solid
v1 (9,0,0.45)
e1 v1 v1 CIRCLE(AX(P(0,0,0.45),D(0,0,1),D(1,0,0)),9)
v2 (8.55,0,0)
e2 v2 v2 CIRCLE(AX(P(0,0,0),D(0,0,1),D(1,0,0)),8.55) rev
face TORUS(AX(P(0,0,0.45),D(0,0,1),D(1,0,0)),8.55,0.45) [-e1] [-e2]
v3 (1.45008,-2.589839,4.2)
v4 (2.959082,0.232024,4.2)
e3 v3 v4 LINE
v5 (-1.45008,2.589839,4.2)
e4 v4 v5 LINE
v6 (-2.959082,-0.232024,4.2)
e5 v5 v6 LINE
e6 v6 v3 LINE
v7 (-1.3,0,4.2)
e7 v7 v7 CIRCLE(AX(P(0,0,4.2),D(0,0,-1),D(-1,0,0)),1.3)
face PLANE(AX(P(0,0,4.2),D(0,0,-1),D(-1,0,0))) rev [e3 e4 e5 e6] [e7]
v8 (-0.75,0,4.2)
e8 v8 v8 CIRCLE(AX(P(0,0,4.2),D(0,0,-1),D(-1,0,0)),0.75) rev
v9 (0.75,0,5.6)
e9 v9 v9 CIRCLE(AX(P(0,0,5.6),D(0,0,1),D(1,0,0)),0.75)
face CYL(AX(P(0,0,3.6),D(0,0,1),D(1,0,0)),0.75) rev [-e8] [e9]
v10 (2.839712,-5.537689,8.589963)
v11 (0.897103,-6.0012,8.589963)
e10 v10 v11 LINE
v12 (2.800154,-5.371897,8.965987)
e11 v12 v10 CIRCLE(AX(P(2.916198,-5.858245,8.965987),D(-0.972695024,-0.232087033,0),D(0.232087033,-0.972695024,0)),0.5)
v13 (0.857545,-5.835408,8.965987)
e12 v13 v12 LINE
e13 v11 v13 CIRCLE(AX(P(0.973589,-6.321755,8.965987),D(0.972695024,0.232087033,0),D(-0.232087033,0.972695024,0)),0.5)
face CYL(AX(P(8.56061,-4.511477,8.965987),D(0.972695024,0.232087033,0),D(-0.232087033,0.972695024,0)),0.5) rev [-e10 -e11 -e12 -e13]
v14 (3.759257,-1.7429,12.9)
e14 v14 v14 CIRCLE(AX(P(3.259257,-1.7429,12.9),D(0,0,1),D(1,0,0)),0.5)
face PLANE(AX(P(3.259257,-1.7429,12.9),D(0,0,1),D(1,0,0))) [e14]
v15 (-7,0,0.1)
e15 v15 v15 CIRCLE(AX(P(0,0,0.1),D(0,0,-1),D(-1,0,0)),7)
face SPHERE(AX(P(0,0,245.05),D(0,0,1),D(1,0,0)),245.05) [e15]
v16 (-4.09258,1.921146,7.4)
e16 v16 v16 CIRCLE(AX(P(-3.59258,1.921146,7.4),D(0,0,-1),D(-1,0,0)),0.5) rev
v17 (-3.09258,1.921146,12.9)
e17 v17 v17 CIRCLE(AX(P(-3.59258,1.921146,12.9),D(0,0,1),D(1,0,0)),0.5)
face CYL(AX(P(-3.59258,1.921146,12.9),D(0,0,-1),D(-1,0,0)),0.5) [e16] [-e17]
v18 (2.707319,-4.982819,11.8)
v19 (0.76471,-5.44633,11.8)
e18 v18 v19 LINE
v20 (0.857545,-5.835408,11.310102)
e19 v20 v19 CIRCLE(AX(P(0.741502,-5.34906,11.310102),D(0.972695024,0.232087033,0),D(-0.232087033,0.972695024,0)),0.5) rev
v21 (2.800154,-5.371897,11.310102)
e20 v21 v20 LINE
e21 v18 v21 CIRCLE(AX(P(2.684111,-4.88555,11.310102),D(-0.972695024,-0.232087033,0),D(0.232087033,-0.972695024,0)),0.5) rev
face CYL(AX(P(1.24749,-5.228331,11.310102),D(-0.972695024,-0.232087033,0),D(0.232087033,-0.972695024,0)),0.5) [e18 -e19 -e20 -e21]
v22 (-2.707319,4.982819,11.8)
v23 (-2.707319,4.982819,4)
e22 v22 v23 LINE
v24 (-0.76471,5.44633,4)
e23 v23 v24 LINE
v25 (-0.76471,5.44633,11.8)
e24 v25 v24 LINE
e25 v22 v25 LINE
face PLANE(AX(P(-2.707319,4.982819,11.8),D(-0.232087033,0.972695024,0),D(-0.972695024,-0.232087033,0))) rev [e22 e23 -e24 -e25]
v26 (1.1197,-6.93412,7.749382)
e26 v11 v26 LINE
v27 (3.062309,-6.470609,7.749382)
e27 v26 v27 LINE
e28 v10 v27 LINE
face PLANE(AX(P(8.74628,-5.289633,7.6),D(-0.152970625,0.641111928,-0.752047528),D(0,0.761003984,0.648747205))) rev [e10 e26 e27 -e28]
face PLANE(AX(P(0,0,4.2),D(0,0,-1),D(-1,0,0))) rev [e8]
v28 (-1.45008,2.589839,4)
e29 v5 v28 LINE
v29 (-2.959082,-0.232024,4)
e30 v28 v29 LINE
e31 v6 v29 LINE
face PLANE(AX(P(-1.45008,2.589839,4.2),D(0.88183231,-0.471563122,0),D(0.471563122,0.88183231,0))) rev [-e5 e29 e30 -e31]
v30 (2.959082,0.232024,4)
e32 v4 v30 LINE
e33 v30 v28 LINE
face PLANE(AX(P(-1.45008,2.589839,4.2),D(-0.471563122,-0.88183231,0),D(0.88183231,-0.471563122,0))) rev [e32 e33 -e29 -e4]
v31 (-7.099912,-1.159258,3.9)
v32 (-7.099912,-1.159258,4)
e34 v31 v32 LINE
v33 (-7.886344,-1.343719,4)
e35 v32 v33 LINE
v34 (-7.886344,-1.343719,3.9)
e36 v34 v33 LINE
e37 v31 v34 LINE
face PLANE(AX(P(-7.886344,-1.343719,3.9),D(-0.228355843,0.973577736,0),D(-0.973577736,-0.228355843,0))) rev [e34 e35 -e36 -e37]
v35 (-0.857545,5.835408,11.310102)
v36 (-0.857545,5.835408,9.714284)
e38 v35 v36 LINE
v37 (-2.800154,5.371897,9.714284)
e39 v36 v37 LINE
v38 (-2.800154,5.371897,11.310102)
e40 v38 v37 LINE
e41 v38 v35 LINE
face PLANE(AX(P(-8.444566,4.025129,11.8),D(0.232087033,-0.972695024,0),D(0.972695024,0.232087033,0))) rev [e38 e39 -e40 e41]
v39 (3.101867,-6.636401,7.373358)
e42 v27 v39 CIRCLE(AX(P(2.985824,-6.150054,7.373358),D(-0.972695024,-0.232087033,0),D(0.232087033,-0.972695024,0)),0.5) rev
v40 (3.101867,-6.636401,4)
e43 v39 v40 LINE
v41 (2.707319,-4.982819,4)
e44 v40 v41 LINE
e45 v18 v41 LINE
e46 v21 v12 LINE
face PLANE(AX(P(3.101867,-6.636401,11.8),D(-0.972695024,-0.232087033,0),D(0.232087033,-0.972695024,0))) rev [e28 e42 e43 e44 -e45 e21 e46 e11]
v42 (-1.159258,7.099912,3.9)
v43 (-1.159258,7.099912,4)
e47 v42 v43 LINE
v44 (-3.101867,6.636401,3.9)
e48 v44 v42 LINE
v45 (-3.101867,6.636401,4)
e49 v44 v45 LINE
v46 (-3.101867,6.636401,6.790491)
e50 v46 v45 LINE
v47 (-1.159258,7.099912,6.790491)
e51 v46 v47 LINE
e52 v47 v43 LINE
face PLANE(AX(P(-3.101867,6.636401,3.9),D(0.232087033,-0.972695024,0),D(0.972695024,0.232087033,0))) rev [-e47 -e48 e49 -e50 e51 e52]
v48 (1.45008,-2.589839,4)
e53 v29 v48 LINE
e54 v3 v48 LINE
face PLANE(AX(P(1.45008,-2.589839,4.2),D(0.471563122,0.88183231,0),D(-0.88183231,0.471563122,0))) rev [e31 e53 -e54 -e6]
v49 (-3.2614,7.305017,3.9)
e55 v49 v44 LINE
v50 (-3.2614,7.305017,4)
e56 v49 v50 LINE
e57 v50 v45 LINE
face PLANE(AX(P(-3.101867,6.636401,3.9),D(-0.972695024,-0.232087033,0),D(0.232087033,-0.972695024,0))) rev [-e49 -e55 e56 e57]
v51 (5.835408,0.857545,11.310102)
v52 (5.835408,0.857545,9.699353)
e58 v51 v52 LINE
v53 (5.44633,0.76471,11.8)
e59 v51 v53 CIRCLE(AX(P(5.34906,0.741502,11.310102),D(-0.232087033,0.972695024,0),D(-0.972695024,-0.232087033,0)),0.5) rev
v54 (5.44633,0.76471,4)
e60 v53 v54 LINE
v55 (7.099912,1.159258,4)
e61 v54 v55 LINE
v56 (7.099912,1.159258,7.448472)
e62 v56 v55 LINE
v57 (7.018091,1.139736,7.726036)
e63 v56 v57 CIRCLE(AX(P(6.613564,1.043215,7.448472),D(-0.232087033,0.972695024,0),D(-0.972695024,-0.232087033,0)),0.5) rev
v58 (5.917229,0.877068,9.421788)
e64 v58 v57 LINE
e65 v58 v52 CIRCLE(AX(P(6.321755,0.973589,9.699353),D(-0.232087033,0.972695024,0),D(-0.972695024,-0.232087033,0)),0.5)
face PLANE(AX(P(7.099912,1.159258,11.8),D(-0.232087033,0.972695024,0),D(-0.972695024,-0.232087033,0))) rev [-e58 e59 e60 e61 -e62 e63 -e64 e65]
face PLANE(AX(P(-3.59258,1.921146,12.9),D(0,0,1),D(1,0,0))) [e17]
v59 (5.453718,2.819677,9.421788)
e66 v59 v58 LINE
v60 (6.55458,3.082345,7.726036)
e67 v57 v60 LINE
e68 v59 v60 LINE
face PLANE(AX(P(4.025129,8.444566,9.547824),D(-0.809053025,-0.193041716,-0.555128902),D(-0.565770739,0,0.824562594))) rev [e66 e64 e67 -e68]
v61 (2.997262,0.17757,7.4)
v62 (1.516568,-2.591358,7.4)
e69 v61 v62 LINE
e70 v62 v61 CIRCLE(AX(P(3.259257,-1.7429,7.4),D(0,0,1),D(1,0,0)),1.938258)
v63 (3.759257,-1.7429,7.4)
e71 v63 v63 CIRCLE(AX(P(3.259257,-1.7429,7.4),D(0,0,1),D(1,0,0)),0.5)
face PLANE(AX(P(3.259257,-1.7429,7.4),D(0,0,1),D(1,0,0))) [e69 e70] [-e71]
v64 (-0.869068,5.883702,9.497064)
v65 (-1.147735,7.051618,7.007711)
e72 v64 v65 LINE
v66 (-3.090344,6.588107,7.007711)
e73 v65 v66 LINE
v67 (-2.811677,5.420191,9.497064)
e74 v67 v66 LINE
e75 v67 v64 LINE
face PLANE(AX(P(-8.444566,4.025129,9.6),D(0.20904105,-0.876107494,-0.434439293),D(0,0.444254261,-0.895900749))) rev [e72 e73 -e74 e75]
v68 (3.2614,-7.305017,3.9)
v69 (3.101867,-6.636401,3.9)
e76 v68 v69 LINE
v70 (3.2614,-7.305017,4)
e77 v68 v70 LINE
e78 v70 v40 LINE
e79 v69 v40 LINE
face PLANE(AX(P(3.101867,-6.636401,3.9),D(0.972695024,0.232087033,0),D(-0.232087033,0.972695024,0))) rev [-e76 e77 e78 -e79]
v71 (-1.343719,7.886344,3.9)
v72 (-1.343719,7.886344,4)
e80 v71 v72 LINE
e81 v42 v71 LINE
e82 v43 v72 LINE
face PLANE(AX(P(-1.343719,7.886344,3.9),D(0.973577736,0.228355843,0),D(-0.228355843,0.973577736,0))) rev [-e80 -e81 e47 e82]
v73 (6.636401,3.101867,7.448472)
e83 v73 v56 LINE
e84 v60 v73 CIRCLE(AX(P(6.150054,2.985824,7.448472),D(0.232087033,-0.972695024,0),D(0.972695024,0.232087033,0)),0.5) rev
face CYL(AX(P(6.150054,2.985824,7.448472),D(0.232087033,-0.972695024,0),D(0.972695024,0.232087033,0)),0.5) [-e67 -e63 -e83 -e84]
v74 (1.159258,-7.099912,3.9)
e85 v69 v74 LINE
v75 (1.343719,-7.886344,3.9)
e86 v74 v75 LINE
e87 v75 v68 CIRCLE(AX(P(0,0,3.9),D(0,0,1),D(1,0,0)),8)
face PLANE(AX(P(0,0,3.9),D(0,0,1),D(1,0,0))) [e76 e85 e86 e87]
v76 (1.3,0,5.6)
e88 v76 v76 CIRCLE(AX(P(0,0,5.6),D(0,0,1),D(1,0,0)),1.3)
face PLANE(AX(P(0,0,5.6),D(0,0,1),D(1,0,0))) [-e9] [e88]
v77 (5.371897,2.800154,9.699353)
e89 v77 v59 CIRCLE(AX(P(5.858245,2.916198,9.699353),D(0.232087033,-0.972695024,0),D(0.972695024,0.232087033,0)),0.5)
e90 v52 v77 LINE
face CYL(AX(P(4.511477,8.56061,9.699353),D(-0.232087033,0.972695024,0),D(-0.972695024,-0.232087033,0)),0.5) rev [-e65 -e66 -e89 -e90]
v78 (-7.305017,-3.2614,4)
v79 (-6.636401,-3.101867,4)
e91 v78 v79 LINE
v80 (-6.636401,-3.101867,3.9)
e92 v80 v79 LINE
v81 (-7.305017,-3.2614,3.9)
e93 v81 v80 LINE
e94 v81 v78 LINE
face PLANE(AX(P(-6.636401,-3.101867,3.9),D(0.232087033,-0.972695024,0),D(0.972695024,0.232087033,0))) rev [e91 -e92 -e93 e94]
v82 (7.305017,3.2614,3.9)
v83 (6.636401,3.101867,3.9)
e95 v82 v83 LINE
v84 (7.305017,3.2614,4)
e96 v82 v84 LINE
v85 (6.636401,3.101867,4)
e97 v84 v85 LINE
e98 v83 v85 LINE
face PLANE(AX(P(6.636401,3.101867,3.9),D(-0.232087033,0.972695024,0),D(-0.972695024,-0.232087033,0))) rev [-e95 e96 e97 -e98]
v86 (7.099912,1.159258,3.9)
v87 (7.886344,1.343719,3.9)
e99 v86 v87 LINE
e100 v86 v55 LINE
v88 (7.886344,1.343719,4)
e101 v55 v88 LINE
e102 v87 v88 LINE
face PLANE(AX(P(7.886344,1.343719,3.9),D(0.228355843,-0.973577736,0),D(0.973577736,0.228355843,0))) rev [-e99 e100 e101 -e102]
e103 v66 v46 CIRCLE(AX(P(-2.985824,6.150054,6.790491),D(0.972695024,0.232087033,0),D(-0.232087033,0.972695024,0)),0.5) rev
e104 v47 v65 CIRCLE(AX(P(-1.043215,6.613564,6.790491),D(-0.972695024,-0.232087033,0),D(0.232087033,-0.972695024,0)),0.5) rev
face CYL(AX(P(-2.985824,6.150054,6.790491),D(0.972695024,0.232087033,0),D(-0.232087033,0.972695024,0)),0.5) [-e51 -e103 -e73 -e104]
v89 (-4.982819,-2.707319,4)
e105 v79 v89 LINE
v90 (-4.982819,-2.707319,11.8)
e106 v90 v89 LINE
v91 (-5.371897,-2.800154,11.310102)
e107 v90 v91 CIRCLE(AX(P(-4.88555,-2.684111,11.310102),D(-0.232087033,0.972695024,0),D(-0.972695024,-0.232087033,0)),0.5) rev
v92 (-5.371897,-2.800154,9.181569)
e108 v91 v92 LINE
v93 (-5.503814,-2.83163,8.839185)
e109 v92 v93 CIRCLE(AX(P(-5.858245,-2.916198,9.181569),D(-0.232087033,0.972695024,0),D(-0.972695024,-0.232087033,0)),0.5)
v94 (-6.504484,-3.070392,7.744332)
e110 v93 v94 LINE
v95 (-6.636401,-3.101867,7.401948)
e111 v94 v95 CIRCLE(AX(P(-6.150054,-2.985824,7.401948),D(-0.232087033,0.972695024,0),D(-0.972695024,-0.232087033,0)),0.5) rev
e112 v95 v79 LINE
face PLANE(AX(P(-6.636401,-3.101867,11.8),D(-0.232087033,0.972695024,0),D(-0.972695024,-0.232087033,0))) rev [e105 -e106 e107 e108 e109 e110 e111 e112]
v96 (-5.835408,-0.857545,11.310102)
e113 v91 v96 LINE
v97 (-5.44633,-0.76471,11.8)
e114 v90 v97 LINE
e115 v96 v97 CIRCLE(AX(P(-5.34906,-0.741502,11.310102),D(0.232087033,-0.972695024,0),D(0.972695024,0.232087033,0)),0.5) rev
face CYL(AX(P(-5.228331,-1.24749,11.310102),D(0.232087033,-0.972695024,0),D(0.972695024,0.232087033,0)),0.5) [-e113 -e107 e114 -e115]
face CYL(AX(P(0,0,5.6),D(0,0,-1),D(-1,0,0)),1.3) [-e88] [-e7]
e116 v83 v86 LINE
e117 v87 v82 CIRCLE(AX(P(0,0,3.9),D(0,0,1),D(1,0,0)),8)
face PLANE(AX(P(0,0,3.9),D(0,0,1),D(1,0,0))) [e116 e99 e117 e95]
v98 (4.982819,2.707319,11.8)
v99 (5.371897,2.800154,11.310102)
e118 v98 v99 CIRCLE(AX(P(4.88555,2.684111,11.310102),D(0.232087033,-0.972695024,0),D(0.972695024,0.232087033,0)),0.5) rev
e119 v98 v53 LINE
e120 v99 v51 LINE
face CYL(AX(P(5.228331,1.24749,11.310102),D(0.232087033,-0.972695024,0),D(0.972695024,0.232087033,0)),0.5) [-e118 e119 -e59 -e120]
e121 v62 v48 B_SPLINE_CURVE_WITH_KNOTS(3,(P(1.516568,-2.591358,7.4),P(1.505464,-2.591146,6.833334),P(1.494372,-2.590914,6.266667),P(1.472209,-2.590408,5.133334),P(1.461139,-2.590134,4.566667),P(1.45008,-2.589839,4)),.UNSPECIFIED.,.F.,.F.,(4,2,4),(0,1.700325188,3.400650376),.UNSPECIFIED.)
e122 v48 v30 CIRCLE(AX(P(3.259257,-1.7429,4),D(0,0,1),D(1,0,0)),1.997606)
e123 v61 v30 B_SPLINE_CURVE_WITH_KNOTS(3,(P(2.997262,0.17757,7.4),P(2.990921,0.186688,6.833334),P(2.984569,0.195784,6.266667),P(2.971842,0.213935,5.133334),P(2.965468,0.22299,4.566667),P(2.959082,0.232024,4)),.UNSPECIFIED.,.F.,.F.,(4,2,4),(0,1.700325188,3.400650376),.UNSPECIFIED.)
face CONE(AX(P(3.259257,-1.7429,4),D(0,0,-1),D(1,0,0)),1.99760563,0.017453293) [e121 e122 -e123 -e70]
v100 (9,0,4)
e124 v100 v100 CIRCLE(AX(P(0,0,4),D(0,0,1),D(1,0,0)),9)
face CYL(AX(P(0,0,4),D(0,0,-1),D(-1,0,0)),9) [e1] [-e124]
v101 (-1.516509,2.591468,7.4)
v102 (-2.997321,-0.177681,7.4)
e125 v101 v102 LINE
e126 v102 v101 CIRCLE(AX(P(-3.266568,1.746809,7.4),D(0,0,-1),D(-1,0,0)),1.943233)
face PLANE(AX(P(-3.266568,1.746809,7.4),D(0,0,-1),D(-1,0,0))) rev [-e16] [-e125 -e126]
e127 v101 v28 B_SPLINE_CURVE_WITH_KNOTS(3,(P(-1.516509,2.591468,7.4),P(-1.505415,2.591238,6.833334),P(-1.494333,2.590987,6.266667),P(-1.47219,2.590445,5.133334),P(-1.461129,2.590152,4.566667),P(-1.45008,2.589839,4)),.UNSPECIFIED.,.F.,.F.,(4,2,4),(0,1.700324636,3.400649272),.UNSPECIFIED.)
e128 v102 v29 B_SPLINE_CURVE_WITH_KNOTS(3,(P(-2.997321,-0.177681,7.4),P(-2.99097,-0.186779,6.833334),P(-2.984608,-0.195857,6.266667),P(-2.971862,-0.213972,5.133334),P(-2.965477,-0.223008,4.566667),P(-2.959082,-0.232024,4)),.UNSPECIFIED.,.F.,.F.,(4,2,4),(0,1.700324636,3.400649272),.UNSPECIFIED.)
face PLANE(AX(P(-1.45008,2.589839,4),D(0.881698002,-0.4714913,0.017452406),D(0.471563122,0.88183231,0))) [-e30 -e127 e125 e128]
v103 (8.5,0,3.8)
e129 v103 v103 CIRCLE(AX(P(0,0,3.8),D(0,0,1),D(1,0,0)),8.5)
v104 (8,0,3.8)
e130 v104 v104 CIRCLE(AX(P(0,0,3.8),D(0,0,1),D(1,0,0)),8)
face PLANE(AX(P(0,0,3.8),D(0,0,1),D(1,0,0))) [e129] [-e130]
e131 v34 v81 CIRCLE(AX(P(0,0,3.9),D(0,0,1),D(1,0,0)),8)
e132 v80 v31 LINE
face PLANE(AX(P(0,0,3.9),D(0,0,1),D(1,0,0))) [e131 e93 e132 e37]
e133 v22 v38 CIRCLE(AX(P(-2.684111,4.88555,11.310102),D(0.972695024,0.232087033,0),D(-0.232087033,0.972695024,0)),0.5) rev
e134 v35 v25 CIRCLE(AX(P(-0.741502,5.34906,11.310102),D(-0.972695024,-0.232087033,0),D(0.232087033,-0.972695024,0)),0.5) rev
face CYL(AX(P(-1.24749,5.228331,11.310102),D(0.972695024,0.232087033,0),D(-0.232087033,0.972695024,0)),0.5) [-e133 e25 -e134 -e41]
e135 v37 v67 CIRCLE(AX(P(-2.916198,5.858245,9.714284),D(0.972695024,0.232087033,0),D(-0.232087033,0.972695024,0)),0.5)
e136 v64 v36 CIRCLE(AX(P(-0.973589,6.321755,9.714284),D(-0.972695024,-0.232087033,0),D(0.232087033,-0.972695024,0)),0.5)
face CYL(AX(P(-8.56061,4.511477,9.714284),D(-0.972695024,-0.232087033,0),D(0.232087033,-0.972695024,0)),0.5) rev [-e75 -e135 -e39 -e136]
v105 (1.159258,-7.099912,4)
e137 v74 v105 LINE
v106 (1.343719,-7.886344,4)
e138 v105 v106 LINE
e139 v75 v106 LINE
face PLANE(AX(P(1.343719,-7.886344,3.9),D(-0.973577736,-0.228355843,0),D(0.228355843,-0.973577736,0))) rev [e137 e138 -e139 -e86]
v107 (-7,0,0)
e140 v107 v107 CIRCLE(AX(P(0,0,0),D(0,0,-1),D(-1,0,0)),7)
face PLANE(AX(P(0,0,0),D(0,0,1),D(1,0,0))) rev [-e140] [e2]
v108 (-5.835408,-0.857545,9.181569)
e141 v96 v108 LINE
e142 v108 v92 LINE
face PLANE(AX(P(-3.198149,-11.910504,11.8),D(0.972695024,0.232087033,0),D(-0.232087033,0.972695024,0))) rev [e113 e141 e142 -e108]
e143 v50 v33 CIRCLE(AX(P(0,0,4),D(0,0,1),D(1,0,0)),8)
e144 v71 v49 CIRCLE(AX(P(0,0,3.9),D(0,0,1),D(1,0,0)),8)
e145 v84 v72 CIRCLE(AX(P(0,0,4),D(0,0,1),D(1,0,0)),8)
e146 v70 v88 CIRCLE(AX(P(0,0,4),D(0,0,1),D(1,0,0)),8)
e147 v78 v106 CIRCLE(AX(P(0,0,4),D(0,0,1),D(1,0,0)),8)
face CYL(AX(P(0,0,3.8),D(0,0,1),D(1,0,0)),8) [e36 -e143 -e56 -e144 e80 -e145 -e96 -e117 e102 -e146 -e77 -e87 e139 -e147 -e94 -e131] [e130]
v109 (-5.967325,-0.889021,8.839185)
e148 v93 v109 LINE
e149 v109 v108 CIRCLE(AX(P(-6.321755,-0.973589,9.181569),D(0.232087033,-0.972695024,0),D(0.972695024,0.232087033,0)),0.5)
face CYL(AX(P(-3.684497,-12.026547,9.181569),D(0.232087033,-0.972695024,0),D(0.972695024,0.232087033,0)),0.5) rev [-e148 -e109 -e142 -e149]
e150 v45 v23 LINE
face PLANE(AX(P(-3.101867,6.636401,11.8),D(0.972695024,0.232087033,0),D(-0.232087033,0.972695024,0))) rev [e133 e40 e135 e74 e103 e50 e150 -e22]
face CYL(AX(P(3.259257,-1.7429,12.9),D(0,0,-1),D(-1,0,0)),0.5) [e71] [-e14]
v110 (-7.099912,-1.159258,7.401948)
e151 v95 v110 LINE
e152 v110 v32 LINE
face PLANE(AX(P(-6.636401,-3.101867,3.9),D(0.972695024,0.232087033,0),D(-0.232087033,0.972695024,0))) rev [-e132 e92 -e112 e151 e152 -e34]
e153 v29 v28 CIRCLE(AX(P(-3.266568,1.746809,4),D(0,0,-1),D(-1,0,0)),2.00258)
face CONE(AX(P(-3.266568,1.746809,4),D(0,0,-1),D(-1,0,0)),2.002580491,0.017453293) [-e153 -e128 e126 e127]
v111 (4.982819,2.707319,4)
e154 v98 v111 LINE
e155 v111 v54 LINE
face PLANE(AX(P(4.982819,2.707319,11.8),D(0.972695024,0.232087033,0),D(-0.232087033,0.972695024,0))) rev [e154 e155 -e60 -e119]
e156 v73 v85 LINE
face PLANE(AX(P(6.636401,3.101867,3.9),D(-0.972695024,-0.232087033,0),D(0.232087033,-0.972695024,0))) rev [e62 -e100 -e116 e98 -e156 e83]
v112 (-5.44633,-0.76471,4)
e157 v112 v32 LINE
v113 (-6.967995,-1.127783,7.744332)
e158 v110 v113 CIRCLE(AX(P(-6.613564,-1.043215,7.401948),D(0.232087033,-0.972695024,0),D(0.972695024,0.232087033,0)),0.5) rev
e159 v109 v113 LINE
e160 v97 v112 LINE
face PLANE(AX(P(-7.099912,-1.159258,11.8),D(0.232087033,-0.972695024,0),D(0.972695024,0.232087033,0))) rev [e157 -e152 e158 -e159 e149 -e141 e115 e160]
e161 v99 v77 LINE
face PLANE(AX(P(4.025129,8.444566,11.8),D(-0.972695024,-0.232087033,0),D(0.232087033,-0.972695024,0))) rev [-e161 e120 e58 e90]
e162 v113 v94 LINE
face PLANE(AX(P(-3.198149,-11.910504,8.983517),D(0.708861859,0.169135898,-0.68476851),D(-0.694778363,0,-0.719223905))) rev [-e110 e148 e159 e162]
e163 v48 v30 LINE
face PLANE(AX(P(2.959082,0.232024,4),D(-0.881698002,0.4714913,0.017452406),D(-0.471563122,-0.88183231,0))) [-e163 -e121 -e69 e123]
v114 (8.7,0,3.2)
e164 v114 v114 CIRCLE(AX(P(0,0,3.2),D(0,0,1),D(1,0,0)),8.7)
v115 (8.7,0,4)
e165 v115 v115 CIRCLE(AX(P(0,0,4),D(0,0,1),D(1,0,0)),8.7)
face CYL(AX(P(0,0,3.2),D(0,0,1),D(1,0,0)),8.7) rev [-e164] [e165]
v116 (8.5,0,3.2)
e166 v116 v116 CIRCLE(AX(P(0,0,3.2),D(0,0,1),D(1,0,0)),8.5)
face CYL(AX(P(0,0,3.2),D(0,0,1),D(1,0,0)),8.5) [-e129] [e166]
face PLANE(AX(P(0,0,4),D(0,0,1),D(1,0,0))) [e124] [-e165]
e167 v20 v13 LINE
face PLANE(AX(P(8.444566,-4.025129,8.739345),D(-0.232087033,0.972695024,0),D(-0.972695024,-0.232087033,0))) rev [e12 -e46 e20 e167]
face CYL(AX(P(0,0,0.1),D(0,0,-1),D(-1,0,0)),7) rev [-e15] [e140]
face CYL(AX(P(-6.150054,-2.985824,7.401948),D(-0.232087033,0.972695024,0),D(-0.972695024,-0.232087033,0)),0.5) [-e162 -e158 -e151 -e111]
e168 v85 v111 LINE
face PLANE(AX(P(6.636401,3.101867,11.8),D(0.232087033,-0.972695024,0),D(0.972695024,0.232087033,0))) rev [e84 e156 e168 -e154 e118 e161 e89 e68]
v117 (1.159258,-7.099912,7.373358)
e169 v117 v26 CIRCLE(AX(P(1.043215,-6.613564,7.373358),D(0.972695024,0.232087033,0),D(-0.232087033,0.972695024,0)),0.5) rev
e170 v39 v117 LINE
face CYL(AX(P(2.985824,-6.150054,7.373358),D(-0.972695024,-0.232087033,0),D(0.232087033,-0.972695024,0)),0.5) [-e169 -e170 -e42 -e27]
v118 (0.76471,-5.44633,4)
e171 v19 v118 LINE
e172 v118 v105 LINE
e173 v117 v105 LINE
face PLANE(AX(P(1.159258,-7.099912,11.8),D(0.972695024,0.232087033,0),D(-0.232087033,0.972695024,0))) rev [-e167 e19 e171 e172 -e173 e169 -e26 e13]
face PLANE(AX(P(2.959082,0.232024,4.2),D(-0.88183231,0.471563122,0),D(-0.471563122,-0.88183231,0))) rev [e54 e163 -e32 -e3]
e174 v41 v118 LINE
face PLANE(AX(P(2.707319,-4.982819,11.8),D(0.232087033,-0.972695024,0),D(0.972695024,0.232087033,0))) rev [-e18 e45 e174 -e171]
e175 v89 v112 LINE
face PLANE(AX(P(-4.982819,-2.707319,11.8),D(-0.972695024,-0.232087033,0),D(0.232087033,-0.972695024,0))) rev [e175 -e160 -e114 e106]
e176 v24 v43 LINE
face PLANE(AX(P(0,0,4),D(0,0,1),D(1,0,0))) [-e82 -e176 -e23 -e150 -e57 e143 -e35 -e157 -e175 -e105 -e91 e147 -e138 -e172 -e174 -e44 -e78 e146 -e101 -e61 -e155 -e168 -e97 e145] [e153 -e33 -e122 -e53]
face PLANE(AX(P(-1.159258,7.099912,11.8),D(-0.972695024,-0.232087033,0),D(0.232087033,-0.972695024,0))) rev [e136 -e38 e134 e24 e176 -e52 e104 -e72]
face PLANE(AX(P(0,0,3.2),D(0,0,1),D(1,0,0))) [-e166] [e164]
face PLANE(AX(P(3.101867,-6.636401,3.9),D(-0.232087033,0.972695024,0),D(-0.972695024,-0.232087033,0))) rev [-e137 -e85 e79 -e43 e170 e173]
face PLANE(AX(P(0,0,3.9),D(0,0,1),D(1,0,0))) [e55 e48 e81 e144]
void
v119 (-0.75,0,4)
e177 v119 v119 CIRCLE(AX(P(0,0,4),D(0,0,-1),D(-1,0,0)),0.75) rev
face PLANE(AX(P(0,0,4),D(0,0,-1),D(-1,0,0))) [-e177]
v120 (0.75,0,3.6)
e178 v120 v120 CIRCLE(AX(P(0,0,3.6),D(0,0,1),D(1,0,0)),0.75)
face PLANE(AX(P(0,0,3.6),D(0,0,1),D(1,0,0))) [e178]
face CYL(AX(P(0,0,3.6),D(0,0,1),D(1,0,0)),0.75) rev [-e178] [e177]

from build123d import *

# Parameters (mm, degrees)
ESQUISSE1_R                  = 9
BOSS_EXTRU_1_DEPTH           = 4
ESQUISSE2_R                  = 7
ENL_V_MAT_EXTRU_1_DEPTH      = 0.1
CONG_2_R                     = 0.45
ESQUISSE5_R                  = 8.7
ESQUISSE5_R_2                = 8.5
ENL_V_MAT_EXTRU_4_DEPTH      = 0.8
ESQUISSE6_R                  = 8.5
ESQUISSE6_R_2                = 8
ENL_V_MAT_EXTRU_5_DEPTH      = 0.2
ESQUISSE7_R                  = 1.3
BOSS_EXTRU_2_DEPTH           = 1.6
ESQUISSE8_R                  = 0.75
ENL_V_MAT_EXTRU_6_DEPTH      = 2
ENL_V_MAT_EXTRU_7_DEPTH      = 0.1
BOSS_EXTRU_4_DEPTH           = 7.8
ENL_V_MAT_EXTRU_9_DEPTH      = 18.685913522
ENL_V_MAT_EXTRU_10_DEPTH     = 7.8
ENL_V_MAT_EXTRU_11_DEPTH     = 7.8
ENL_V_MAT_EXTRU_12_DEPTH     = 7.8
CONG_4_R                     = 0.5
BOSS_EXTRU_5_DEPTH           = 0.2
BOSS_EXTRU_6_DEPTH           = 0.2
BOSS_EXTRU_7_DEPTH           = 3.4
BOSS_EXTRU_7_DRAFT           = 1
BOSS_EXTRU_7_PROFILE_2_DEPTH = 3.4
BOSS_EXTRU_7_PROFILE_2_DRAFT = 1
ESQUISSE22_R                 = 0.5
BOSS_EXTRU_8_DEPTH           = 5.5


with BuildPart() as part:
    # Esquisse1 → Boss.-Extru.1 (new body)
    with BuildSketch(Plane.XY):
        Circle(ESQUISSE1_R)
    extrude(amount=BOSS_EXTRU_1_DEPTH)

    # Esquisse2 → Enlèv. mat.-Extru.1 (cut)
    with BuildSketch(Plane(origin=(0, 0, 0), x_dir=(-1, 0, 0), z_dir=(0, 0, -1))):
        Circle(ESQUISSE2_R)
    extrude(amount=-ENL_V_MAT_EXTRU_1_DEPTH, mode=Mode.SUBTRACT)

    # Dôme1: read off the stored shape, not the designer's step
    # Dôme1 outline → Dôme1 (revolve)
    with BuildSketch(Plane.XZ):
        with BuildLine():
            Line((0, 0.100000007), (0, 0))
            ThreePointArc((0, 0), (3.500357247, 0.025001277), (7.000000245, 0.100000007))
            Line((7.000000245, 0.100000007), (0, 0.100000007))
        make_face()
    revolve(axis=Axis((0, 0, 0), (0, 0, 1)))

    # Congé2
    cong_2_edges = [part.edges().sort_by_distance(p)[0] for p in [
        (-9, 0, 0),
    ]]
    fillet(cong_2_edges, radius=CONG_2_R)

    # Esquisse5 → Enlèv. mat.-Extru.4 (cut)
    with BuildSketch(Plane.XY.offset(4)):
        Circle(ESQUISSE5_R)
        Circle(ESQUISSE5_R_2, mode=Mode.SUBTRACT)
    extrude(amount=-ENL_V_MAT_EXTRU_4_DEPTH, mode=Mode.SUBTRACT)

    # Esquisse6 → Enlèv. mat.-Extru.5 (cut)
    with BuildSketch(Plane.XY.offset(4)):
        Circle(ESQUISSE6_R)
        Circle(ESQUISSE6_R_2, mode=Mode.SUBTRACT)
    extrude(amount=-ENL_V_MAT_EXTRU_5_DEPTH, mode=Mode.SUBTRACT)

    # Esquisse7 → Boss.-Extru.2 (add)
    with BuildSketch(Plane.XY.offset(4)):
        Circle(ESQUISSE7_R)
    extrude(amount=BOSS_EXTRU_2_DEPTH)

    # Esquisse8 → Enlèv. mat.-Extru.6 (cut)
    with BuildSketch(Plane.XY.offset(5.6)):
        Circle(ESQUISSE8_R)
    extrude(amount=-ENL_V_MAT_EXTRU_6_DEPTH, mode=Mode.SUBTRACT)

    # Esquisse9 → Enlèv. mat.-Extru.7 (cut)
    with BuildSketch(Plane.XY.offset(4)):
        with BuildLine():
            Line((-3.101867345, 6.636401024), (-1.159258404, 7.099911513))
            Line((-1.159258404, 7.099911513), (-1.343718693, 7.886343898))
            ThreePointArc((-1.343718693, 7.886343898), (-2.320833, 7.655960697), (-3.261400396, 7.305016595))
            Line((-3.261400396, 7.305016595), (-3.101867345, 6.636401024))
        make_face()
        with BuildLine():
            Line((6.636401024, 3.101867345), (7.099911513, 1.159258404))
            Line((7.099911513, 1.159258404), (7.886343898, 1.343718693))
            ThreePointArc((7.886343898, 1.343718693), (7.655960697, 2.320833), (7.305016595, 3.261400396))
            Line((7.305016595, 3.261400396), (6.636401024, 3.101867345))
        make_face()
        with BuildLine():
            Line((3.101867345, -6.636401024), (1.159258404, -7.099911513))
            Line((1.159258404, -7.099911513), (1.343718693, -7.886343898))
            ThreePointArc((1.343718693, -7.886343898), (2.320833, -7.655960697), (3.261400396, -7.305016595))
            Line((3.261400396, -7.305016595), (3.101867345, -6.636401024))
        make_face()
        with BuildLine():
            Line((-6.636401024, -3.101867345), (-7.305016595, -3.261400396))
            ThreePointArc((-7.305016595, -3.261400396), (-7.655960697, -2.320833), (-7.886343898, -1.343718693))
            Line((-7.886343898, -1.343718693), (-7.099911513, -1.159258404))
            Line((-7.099911513, -1.159258404), (-6.636401024, -3.101867345))
        make_face()
    extrude(amount=-ENL_V_MAT_EXTRU_7_DEPTH, mode=Mode.SUBTRACT)

    # Esquisse10 → Boss.-Extru.4 (add)
    with BuildSketch(Plane.XY.offset(4)):
        Polygon((-6.636401024, -3.101867345), (-7.099911513, -1.159258404), (-5.446329973, -0.764710448), (-4.982819484, -2.707319388), align=None)
        Polygon((-3.101867345, 6.636401024), (-2.707319388, 4.982819484), (-0.764710448, 5.446329973), (-1.159258404, 7.099911513), align=None)
        Polygon((6.636401024, 3.101867345), (4.982819484, 2.707319388), (5.446329973, 0.764710448), (7.099911513, 1.159258404), align=None)
        Polygon((3.101867345, -6.636401024), (2.707319388, -4.982819484), (0.764710448, -5.446329973), (1.159258404, -7.099911513), align=None)
    extrude(amount=BOSS_EXTRU_4_DEPTH)

    # Esquisse11 → Enlèv. mat.-Extru.9 (cut, through all)
    with BuildSketch(Plane(origin=(-0.120729939, 0.505988675, 0), x_dir=(0.9726950236017893, 0.23208703337393644, 0), z_dir=(-0.23208703337393644, 0.9726950236017893, 0))):
        Polygon((-7.175097441, -11.8), (-7.175097441, -8.98351696), (-7.175097441, -7.6), (-5.875097441, -8.98351696), (-5.875097441, -11.8), align=None)
    extrude(amount=-ENL_V_MAT_EXTRU_9_DEPTH, mode=Mode.SUBTRACT)

    # Esquisse15 → Enlèv. mat.-Extru.10 (cut)
    with BuildSketch(Plane(origin=(0.505988675, 0.120729939, 0), x_dir=(0, 0, -1), z_dir=(0.9726950236017902, 0.232087033373933, 0))):
        Polygon((-9.6, 5.875097441), (-6.904775441, 7.175097441), (-7.6, 7.175097441), (-11.8, 7.175097441), (-11.8, 5.875097441), align=None)
    extrude(amount=-ENL_V_MAT_EXTRU_10_DEPTH, mode=Mode.SUBTRACT)

    # Esquisse16 → Enlèv. mat.-Extru.11 (cut)
    with BuildSketch(Plane(origin=(-0.505988675, -0.120729939, 0), x_dir=(0, 0, 1), z_dir=(-0.9726950236017917, -0.23208703337392622, 0))):
        Polygon((11.8, -5.875097441), (11.8, -7.175097441), (7.6, -7.175097441), (8.739344939, -5.875097441), align=None)
    extrude(amount=-ENL_V_MAT_EXTRU_11_DEPTH, mode=Mode.SUBTRACT)

    # Esquisse17 → Enlèv. mat.-Extru.12 (cut)
    with BuildSketch(Plane(origin=(0.120729939, -0.505988675, 0), x_dir=(0.9726950236017909, 0.2320870333739296, 0), z_dir=(0.2320870333739296, -0.9726950236017909, 0))):
        Polygon((7.175097441, 11.8), (5.875097441, 11.8), (5.875097441, 9.547824416), (7.175097441, 7.6), align=None)
    extrude(amount=-ENL_V_MAT_EXTRU_12_DEPTH, mode=Mode.SUBTRACT)

    # Congé4
    # the kernel refuses this fillet: 0.5 mm, written as the material it adds along each edge
    with BuildSketch(Plane(origin=(-0.857545261, 5.835407983, 9.6), x_dir=(0, 0, 1), z_dir=(-0.97269502360179, -0.23208703337393297, 0))) as cong_4_piece_1:
        with BuildLine():
            CenterArc((CONG_4_R * 0.228567915795, CONG_4_R), CONG_4_R, 244.250379429, 25.749620571)
            Line((-CONG_4_R * 0.205871376913, CONG_4_R * 0.0992988836737), (0, 0))
            Line((0, 0), (CONG_4_R * 0.228567915795, 0))
        make_face()
    extrude(amount=1.997140824)
    with BuildSketch(Plane(origin=(-5.835407983, -0.857545261, 8.98351696), x_dir=(-0.6660709221869021, -0.15892589207928975, -0.7287606516846885), z_dir=(0.23208703337393644, -0.9726950236017893, 0))) as cong_4_piece_2:
        with BuildLine():
            CenterArc((CONG_4_R * 0.396103711366, -CONG_4_R), CONG_4_R, 90, 43.217404507)
            Line((-CONG_4_R * 0.28866479883, -CONG_4_R * 0.271239348315), (0, 0))
            Line((0, 0), (CONG_4_R * 0.396103711366, 0))
        make_face()
    extrude(amount=1.997140824)
    with BuildSketch(Plane(origin=(0.857545261, -5.835407983, 8.739344939), x_dir=(0, 0, 1), z_dir=(0.9726950236017917, 0.23208703337392622, 0))) as cong_4_piece_3:
        with BuildLine():
            CenterArc((CONG_4_R * 0.453284010848, CONG_4_R), CONG_4_R, 221.231946302, 48.768053698)
            Line((-CONG_4_R * 0.298763516847, CONG_4_R * 0.340891119702), (0, 0))
            Line((0, 0), (CONG_4_R * 0.453284010848, 0))
        make_face()
    extrude(amount=1.997140824)
    with BuildSketch(Plane(origin=(5.835407983, 0.857545261, 9.547824416), x_dir=(0, 0, 1), z_dir=(-0.2320870333739296, 0.9726950236017909, 0))) as cong_4_piece_4:
        with BuildLine():
            CenterArc((CONG_4_R * 0.303056945208, CONG_4_R), CONG_4_R, 236.280406284, 33.719593716)
            Line((-CONG_4_R * 0.252071957179, CONG_4_R * 0.168235669354), (0, 0))
            Line((0, 0), (CONG_4_R * 0.303056945208, 0))
        make_face()
    extrude(amount=1.997140824)
    # the kernel refuses this fillet: 0.5 mm, written as the material it takes off along each edge
    with BuildSketch(Plane(origin=(-0.881349812, 7.166221075, 6.904775441), x_dir=(-3.0267422968955946e-12, 1.2685315190237014e-11, -1.0), z_dir=(-0.97269502360179, -0.23208703337393297, 0))) as cong_4_2_piece_1:
        with BuildLine():
            CenterArc((CONG_4_R * 0.228567915782, CONG_4_R), CONG_4_R, 244.25037943, 25.749620571)
            Line((-CONG_4_R * 0.205871376915, CONG_4_R * 0.0992988836686), (0, 0))
            Line((0, 0), (CONG_4_R * 0.228567915795, 0))
        make_face()
    extrude(amount=2.568560613, mode=Mode.SUBTRACT)
    with BuildSketch(Plane(origin=(0.333757981, 6.119655386, 11.8), x_dir=(0.2320870333739329, -0.9726950236017899, -1.5765166949672101e-12), z_dir=(-0.97269502360179, -0.23208703337393297, 0)), Plane(origin=(-0.333757981, -6.119655386, 11.8), x_dir=(-0.2320870333739262, 0.9726950236017916, -1.5587531265732232e-12), z_dir=(0.9726950236017917, 0.23208703337392622, 0)), Plane(origin=(6.119655386, -0.333757981, 11.8), x_dir=(-0.9726950236017908, -0.23208703337392958, -1.576516694967215e-12), z_dir=(-0.2320870333739296, 0.9726950236017909, 0))) as cong_4_2_piece_2:
        with BuildLine():
            CenterArc((0.5, -0.489897949), CONG_4_R, 101.536959033, 78.463040967)
            Line((0, -0.489897949), (0, 0))
            Line((0, 0), (0.4, 0))
        make_face()
    extrude(amount=4.446630567, mode=Mode.SUBTRACT)
    with BuildSketch(Plane(origin=(-6.119655386, 0.333757981, 11.8), x_dir=(0, 0, -1), z_dir=(0.23208703337393644, -0.9726950236017893, 0))) as cong_4_2_piece_3:
        with BuildLine():
            CenterArc((0.489897949, 0.5), CONG_4_R, 191.536959033, 78.463040967)
            Line((0, 0.4), (0, 0))
            Line((0, 0), (0.489897949, 0))
        make_face()
    extrude(amount=4.446630567, mode=Mode.SUBTRACT)
    with BuildSketch(Plane(origin=(-7.214824682, -0.677648268, 7.6), x_dir=(0, 0, -1), z_dir=(0.23208703337393644, -0.9726950236017893, 0))) as cong_4_2_piece_4:
        with BuildLine():
            CenterArc((CONG_4_R * 0.396103711366, CONG_4_R), CONG_4_R, 226.782595493, 43.217404507)
            Line((-CONG_4_R * 0.28866479883, CONG_4_R * 0.271239348315), (0, 0))
            Line((0, 0), (CONG_4_R * 0.396103711366, 0))
        make_face()
    extrude(amount=2.987400102, mode=Mode.SUBTRACT)
    with BuildSketch(Plane(origin=(0.608124527, -7.23141319, 7.6), x_dir=(1.338594444706181e-12, -5.610154673694855e-12, -1.0), z_dir=(0.9726950236017917, 0.23208703337392622, 0))) as cong_4_2_piece_5:
        with BuildLine():
            CenterArc((CONG_4_R * 0.453284010843, CONG_4_R), CONG_4_R, 221.231946302, 48.768053698)
            Line((-CONG_4_R * 0.29876351685, CONG_4_R * 0.340891119699), (0, 0))
            Line((0, 0), (CONG_4_R * 0.453284010848, 0))
        make_face()
    extrude(amount=3.130350851, mode=Mode.SUBTRACT)
    with BuildSketch(Plane(origin=(7.187830998, 0.790780926, 7.6), x_dir=(1.7990455545703256e-11, 4.292559697886523e-12, -1.0), z_dir=(-0.2320870333739296, 0.9726950236017909, 0))) as cong_4_2_piece_6:
        with BuildLine():
            CenterArc((CONG_4_R * 0.30305694519, CONG_4_R), CONG_4_R, 236.280406285, 33.719593716)
            Line((-CONG_4_R * 0.252071957184, CONG_4_R * 0.168235669346), (0, 0))
            Line((0, 0), (CONG_4_R * 0.303056945208, 0))
        make_face()
    extrude(amount=2.754783187, mode=Mode.SUBTRACT)

    # Esquisse19 → Boss.-Extru.5 (add)
    with BuildSketch(Plane.XY.offset(4)):
        Polygon((-1.45007978, 2.589839499), (2.959081769, 0.232023891), (1.45007978, -2.589839499), (-2.959081769, -0.232023891), align=None)
    extrude(amount=BOSS_EXTRU_5_DEPTH)

    # Esquisse19<2> → Boss.-Extru.6 (add)
    with BuildSketch(Plane.XY.offset(4)):
        Polygon((-1.45007978, 2.589839499), (2.959081769, 0.232023891), (1.45007978, -2.589839499), (-2.959081769, -0.232023891), align=None)
    extrude(amount=BOSS_EXTRU_6_DEPTH)


with BuildPart() as boss_extru_7_tool:
    # Esquisse21 → Boss.-Extru.7 (with draft: the straight prism first)
    with BuildSketch(Plane.XY.offset(4)):
        with BuildLine():
            Line((2.959081769, 0.232023891), (1.45007978, -2.589839499))
            ThreePointArc((1.45007978, -2.589839499), (5.020809919, -2.684896859), (2.959081769, 0.232023891))
        make_face()
    extrude(amount=BOSS_EXTRU_7_DEPTH)
    # Boss.-Extru.7: the draft: its side faces are tilted about the plane it starts from
    boss_extru_7_sides = [boss_extru_7_tool.faces().sort_by_distance(p)[0] for p in [
        (2.204580774, -1.178907804, 5.7),
        (5.020809919, -2.684896859, 5.7),
    ]]
    draft(boss_extru_7_sides, Plane.XY.offset(4), BOSS_EXTRU_7_DRAFT)


with BuildPart() as part_1:
    add(part.part)

    # Boss.-Extru.7: add boss_extru_7_tool
    add(boss_extru_7_tool.part)


with BuildPart() as boss_extru_7_profile_2_tool:
    # Esquisse21 → Boss.-Extru.7 profile 2 (with draft: the straight prism first)
    with BuildSketch(Plane.XY.offset(4)):
        with BuildLine():
            ThreePointArc((-1.45007978, 2.589839499), (-5.032507992, 2.691152447), (-2.959081769, -0.232023891))
            Line((-2.959081769, -0.232023891), (-1.45007978, 2.589839499))
        make_face()
    extrude(amount=BOSS_EXTRU_7_PROFILE_2_DEPTH)
    # Boss.-Extru.7 profile 2: the draft: its side faces are tilted about the plane it starts from
    boss_extru_7_profile_2_sides = [boss_extru_7_profile_2_tool.faces().sort_by_distance(p)[0] for p in [
        (-2.204580774, 1.178907804, 5.7),
        (-5.032507992, 2.691152447, 5.7),
    ]]
    draft(boss_extru_7_profile_2_sides, Plane.XY.offset(4), BOSS_EXTRU_7_PROFILE_2_DRAFT)


with BuildPart() as part_2:
    add(part_1.part)

    # Boss.-Extru.7 profile 2: add boss_extru_7_profile_2_tool
    add(boss_extru_7_profile_2_tool.part)

    # Esquisse22 → Boss.-Extru.8 (add)
    with BuildSketch(Plane.XY.offset(7.4)):
        with Locations((3.259256733, -1.742899713)):
            Circle(ESQUISSE22_R)
        with Locations(Location((-3.592580313, 1.921145742, 0), (0, 0, 180))):
            Circle(ESQUISSE22_R)
    extrude(amount=BOSS_EXTRU_8_DEPTH)


solid = part_2.part
